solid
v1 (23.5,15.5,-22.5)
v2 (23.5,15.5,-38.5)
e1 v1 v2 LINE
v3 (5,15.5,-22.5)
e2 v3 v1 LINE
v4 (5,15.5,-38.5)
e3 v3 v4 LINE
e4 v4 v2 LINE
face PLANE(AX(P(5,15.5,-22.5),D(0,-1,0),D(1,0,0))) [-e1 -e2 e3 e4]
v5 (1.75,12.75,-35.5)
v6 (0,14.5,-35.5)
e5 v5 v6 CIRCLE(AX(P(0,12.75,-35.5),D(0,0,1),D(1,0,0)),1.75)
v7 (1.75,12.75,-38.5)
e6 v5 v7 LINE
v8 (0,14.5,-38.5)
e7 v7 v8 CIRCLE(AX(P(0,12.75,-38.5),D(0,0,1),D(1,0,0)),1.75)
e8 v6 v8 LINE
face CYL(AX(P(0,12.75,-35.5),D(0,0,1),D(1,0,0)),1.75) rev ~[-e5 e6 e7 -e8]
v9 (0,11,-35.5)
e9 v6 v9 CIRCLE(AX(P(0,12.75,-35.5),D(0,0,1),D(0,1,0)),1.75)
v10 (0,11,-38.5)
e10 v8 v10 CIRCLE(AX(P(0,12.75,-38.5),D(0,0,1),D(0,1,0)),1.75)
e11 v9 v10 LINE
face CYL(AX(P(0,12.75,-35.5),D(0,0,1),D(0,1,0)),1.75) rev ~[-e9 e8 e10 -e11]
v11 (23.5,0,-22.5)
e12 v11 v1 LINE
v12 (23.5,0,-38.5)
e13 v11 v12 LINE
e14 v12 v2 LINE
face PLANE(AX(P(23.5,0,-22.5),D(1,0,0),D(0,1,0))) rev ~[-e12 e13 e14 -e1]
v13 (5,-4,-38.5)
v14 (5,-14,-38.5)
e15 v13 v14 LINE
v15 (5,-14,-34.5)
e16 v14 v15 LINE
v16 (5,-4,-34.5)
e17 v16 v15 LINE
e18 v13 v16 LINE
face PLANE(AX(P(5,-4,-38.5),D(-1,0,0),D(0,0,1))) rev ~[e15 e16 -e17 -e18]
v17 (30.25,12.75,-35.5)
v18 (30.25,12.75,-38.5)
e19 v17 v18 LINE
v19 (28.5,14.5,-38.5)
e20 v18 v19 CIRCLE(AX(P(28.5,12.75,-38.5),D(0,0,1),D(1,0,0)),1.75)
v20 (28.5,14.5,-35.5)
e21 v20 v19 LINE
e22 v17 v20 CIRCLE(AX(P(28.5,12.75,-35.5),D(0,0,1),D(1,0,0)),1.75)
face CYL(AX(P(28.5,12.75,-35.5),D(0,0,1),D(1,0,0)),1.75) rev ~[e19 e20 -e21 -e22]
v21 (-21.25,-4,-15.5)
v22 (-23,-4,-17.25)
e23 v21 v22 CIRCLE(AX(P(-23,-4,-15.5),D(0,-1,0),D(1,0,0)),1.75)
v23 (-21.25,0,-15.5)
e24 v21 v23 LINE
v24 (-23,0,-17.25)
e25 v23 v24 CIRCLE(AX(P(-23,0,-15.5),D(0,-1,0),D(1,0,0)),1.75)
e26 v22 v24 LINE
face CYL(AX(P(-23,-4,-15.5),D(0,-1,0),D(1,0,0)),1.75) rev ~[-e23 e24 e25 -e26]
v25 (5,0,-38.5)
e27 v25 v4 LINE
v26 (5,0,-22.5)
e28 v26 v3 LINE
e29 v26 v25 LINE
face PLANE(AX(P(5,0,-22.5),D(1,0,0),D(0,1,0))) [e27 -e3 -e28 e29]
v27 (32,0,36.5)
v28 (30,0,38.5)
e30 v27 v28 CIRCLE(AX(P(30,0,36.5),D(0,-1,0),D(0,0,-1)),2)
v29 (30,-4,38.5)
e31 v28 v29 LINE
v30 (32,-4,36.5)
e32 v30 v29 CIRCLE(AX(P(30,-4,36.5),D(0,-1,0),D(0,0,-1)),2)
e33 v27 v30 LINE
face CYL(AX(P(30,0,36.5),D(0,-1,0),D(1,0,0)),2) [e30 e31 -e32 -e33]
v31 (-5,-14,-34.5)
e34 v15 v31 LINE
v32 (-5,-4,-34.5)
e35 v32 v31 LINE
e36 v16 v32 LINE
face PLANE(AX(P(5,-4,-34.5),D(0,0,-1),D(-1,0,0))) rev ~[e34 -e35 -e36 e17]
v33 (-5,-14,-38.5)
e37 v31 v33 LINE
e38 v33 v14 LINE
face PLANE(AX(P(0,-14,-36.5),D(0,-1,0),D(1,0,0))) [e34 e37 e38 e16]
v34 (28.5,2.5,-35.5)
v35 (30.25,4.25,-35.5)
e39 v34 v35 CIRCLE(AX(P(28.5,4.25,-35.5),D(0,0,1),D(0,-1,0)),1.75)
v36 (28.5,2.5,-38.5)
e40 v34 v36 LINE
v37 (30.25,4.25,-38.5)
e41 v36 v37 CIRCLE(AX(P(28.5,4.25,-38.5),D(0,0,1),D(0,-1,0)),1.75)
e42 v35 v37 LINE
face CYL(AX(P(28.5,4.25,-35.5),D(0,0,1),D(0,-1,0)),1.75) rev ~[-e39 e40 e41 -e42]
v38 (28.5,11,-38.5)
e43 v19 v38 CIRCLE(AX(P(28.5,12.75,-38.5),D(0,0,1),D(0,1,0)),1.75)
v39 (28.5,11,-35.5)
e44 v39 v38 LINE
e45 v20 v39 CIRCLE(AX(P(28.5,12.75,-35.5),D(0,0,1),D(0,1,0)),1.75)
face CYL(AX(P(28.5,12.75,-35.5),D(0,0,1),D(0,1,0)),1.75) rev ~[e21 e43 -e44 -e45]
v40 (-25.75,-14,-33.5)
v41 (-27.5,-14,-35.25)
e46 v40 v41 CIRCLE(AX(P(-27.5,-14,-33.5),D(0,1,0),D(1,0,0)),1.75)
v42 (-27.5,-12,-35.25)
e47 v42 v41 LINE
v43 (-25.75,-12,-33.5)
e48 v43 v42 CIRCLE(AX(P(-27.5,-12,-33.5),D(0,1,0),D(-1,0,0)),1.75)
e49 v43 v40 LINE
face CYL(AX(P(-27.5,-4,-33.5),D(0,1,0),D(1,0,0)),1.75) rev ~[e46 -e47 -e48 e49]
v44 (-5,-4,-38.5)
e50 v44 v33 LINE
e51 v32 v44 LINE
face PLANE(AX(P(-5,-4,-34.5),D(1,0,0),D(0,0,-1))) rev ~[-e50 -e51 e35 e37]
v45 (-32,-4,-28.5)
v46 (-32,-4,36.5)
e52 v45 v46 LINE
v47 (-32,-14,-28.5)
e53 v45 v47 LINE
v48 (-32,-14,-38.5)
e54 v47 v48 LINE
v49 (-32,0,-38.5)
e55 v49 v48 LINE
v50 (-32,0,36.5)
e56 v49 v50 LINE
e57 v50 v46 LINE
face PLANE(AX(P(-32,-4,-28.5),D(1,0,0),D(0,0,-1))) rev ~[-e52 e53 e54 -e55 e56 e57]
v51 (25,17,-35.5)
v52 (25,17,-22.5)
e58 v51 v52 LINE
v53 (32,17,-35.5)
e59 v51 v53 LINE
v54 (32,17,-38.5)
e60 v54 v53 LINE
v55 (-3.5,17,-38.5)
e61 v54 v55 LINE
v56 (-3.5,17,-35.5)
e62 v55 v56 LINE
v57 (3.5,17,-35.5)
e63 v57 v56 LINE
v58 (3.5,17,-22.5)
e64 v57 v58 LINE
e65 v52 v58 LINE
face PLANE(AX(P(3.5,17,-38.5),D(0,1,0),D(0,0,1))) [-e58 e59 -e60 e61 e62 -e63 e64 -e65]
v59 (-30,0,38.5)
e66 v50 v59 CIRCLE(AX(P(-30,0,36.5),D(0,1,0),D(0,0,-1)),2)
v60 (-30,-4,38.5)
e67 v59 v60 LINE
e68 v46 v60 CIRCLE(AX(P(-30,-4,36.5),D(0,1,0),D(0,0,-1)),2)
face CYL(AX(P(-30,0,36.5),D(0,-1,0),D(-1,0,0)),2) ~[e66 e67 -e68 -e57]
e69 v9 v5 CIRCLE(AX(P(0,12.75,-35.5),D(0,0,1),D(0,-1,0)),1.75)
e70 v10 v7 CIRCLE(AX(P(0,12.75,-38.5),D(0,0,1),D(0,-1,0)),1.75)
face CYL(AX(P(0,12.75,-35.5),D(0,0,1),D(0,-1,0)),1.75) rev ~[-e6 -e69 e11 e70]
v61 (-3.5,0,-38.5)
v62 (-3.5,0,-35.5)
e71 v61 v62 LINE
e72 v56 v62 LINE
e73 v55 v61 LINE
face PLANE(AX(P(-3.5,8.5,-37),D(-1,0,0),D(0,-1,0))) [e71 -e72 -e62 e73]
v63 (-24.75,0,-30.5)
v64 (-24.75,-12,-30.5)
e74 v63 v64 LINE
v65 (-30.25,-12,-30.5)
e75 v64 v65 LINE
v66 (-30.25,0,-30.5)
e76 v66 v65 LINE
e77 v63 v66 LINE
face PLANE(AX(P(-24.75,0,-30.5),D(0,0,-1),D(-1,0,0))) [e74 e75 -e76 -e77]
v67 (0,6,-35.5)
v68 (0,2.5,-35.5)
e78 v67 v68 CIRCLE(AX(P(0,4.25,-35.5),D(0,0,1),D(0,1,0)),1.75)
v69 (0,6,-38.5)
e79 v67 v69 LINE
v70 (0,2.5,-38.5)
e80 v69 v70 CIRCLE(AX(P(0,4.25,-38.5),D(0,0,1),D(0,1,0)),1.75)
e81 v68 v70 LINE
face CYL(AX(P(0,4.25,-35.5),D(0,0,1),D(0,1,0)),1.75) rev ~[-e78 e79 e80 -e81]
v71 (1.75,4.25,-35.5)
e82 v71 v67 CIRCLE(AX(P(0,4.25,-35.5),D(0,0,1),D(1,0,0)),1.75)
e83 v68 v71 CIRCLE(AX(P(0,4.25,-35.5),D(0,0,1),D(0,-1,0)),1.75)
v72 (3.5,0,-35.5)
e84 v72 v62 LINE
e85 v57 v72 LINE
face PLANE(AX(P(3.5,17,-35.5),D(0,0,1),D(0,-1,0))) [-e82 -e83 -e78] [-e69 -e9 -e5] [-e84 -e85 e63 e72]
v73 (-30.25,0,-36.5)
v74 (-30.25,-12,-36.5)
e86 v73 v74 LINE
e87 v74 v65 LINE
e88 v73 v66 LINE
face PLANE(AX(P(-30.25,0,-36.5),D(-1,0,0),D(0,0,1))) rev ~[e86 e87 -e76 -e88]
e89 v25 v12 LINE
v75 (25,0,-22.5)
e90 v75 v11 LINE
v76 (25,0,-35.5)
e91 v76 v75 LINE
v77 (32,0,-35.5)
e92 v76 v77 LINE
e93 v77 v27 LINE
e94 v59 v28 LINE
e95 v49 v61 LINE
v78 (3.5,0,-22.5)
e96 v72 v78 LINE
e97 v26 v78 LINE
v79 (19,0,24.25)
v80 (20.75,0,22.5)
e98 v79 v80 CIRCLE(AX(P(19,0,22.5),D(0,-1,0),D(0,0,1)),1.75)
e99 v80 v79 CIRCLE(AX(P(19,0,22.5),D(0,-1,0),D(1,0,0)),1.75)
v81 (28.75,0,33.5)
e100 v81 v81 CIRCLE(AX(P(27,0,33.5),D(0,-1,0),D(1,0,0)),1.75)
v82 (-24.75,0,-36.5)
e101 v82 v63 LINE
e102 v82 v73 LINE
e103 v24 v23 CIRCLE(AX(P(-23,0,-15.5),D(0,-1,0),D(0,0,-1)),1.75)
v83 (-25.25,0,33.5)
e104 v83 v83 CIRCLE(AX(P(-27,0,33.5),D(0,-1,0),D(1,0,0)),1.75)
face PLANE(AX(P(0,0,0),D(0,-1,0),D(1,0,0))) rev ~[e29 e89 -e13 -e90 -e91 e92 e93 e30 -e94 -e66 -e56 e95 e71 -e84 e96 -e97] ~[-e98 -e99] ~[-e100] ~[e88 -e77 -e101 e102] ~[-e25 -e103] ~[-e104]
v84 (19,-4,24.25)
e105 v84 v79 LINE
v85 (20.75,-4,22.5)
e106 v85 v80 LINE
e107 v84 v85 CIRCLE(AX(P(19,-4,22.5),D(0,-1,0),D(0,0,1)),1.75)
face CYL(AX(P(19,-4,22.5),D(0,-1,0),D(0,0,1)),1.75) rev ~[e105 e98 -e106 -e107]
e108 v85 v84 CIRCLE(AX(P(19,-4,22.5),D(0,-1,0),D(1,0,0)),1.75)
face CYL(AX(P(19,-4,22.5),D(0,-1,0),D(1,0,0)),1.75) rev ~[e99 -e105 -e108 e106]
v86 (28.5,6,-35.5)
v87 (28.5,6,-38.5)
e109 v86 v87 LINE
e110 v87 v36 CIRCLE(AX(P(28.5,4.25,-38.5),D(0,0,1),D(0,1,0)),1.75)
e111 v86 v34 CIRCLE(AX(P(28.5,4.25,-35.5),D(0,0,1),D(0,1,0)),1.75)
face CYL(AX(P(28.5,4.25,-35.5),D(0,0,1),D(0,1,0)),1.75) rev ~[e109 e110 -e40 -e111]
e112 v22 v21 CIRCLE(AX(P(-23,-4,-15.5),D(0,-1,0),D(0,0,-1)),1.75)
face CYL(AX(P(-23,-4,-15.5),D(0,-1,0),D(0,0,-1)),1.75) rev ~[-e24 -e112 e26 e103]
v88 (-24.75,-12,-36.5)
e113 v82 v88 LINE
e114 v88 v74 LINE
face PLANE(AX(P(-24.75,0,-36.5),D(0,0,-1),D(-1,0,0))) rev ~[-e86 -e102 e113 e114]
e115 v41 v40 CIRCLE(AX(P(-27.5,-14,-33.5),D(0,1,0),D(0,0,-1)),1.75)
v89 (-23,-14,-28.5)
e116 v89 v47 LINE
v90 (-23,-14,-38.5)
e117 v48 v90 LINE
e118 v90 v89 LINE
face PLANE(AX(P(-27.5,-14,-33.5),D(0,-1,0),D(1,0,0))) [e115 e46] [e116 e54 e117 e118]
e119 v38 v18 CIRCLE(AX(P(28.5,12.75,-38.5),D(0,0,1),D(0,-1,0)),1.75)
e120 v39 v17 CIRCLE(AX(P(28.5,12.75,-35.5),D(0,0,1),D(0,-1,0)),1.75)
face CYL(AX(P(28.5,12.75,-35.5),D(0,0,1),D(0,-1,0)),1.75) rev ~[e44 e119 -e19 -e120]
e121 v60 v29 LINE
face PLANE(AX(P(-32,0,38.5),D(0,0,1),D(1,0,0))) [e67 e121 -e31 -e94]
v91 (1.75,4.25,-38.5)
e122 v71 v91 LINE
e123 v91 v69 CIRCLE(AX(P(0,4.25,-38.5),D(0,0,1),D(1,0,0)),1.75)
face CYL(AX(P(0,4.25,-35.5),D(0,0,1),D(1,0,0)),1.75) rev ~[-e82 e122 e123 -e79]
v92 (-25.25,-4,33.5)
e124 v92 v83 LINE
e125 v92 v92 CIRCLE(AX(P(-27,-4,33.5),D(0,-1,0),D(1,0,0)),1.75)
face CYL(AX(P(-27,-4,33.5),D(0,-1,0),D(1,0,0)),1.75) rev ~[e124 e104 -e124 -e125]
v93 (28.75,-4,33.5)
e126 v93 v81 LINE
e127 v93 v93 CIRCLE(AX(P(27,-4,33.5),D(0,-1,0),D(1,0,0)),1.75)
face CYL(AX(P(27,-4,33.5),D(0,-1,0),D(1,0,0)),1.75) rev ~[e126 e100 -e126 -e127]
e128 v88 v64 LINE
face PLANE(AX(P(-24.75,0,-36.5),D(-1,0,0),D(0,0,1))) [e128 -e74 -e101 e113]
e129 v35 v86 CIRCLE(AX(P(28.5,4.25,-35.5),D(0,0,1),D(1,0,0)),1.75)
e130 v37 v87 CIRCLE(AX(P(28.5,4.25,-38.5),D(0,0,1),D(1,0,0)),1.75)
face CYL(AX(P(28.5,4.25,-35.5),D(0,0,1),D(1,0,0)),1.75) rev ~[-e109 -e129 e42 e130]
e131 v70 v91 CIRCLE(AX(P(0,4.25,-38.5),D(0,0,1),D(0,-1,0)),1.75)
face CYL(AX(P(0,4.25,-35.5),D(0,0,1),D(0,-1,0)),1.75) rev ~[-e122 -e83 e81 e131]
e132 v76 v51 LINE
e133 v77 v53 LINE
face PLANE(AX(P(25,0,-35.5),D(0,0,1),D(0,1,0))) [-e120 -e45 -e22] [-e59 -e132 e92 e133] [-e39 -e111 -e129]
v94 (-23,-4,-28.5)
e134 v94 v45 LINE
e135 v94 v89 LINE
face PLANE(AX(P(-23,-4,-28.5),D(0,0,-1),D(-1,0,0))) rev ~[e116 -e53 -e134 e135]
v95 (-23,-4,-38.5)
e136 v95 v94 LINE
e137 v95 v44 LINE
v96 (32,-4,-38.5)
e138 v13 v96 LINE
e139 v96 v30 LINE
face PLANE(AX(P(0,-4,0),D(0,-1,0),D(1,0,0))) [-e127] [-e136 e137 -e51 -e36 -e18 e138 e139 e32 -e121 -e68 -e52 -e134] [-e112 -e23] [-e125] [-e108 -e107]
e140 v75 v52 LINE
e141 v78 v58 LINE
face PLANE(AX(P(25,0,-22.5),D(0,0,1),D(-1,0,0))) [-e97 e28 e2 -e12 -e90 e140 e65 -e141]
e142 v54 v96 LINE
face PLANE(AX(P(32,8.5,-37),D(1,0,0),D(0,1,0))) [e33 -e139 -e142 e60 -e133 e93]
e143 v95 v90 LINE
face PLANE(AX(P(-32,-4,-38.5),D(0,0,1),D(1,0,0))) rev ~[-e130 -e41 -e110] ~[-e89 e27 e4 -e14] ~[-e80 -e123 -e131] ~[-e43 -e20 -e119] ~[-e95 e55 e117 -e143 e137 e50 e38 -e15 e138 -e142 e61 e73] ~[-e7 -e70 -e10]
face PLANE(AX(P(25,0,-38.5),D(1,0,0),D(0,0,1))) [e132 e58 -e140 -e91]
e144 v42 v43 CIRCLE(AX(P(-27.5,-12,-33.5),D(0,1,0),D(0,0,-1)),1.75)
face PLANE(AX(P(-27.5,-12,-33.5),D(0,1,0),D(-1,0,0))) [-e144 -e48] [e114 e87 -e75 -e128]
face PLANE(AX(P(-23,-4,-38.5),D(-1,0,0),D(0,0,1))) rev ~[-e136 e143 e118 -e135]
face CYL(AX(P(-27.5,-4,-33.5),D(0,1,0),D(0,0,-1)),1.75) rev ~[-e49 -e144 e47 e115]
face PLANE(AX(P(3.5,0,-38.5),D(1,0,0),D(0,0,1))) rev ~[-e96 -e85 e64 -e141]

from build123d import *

# Parameters (mm, degrees)
F0_W      = 64
F0_H      = 77
F1_DEPTH  = 4
F2_R      = 1.75
F3_DEPTH  = 25
F5_DEPTH  = 10
F7_DEPTH  = 25
F8_W      = 21.5
F8_H      = 16
F9_DEPTH  = 17
F10_W     = 18.5
F10_H     = 15.5
F11_DEPTH = 25
F12_W     = 17
F12_H     = 3
F13_DEPTH = 7
F14_W     = 17
F14_H     = 3
F15_DEPTH = 7
F17_DEPTH = 25
F19_DEPTH = 25
F21_DEPTH = 10
F22_DEPTH = 25
F23_W     = 5.5
F23_H     = 6
F23_R     = 1.75
F24_DEPTH = 12
F25_R     = 2


# Not quite as in the source:
# - a feature names something its author has since deleted; it is built from what else it names


with BuildPart() as f1:
    # F0 (on Front) → F1 (new body)
    with BuildSketch(Plane.XZ):
        Rectangle(F0_W, F0_H)
    extrude(amount=F1_DEPTH)

    # F2 (on face) → F3 (cut)
    with BuildSketch(Plane.XZ.offset(4)):
        with BuildLine():
            ThreePointArc((-28.75, 33.5), (-27, 31.75), (-25.25, 33.5))
            ThreePointArc((-25.25, 33.5), (-27, 35.25), (-28.75, 33.5))
        make_face()
        with Locations((27, 33.5)):
            Circle(F2_R)
    extrude(amount=-F3_DEPTH, mode=Mode.SUBTRACT)

    # F4 (on face) → F5 (join)
    with BuildSketch(Plane.XZ.offset(4)):
        Polygon((-5, -34.5), (-5, -38.5), (0, -38.5), (5, -38.5), (5, -34.5), align=None)
    extrude(amount=F5_DEPTH)

    # F6 (on face) → F7 (cut)
    with BuildSketch(Plane.XZ.offset(4)):
        with BuildLine():
            Line((19, 22.5), (19, 24.25))
            ThreePointArc((19, 24.25), (17.7625631329, 21.2625631329), (20.75, 22.5))
            Line((20.75, 22.5), (19, 22.5))
        make_face()
        with BuildLine():
            ThreePointArc((20.75, 22.5), (20.2374368671, 23.7374368671), (19, 24.25))
            Line((19, 24.25), (19, 22.5))
            Line((19, 22.5), (20.75, 22.5))
        make_face()
        with BuildLine():
            ThreePointArc((-21.25, -15.5), (-24.2374368671, -14.2625631329), (-23, -17.25))
            ThreePointArc((-23, -17.25), (-21.7625631329, -16.7374368671), (-21.25, -15.5))
        make_face()
    extrude(amount=-F7_DEPTH, mode=Mode.SUBTRACT)

    # F8 (on face) → F9 (join)
    with BuildSketch(Plane(origin=(0, 0, 0), x_dir=(-1, 0, 0), z_dir=(0, 1, 0))):
        with Locations((-14.25, -30.5)):
            Rectangle(F8_W, F8_H)
    extrude(amount=F9_DEPTH)

    # F10 (on face) → F11 (cut)
    with BuildSketch(Plane.XY.offset(-22.5)):
        with Locations((14.25, 7.75)):
            Rectangle(F10_W, F10_H)
    extrude(amount=-F11_DEPTH, mode=Mode.SUBTRACT)

    # F12 (on face) → F13 (join)
    with BuildSketch(Plane.YZ.offset(25)):
        with Locations((8.5, -37)):
            Rectangle(F12_W, F12_H)
    extrude(amount=F13_DEPTH)

    # F14 (on face) → F15 (join)
    with BuildSketch(Plane(origin=(3.5, 0, 0), x_dir=(0, -1, 0), z_dir=(-1, 0, 0))):
        with Locations((-8.5, -37)):
            Rectangle(F14_W, F14_H)
    extrude(amount=F15_DEPTH)

    # F16 (on face) → F17 (cut)
    with BuildSketch(Plane.XY.offset(-35.5)):
        with BuildLine():
            Line((0, 14.5), (0, 11))
            ThreePointArc((0, 11), (1.2374368671, 11.5125631329), (1.75, 12.75))
            ThreePointArc((1.75, 12.75), (1.2374368671, 13.9874368671), (0, 14.5))
        make_face()
        with BuildLine():
            ThreePointArc((0, 14.5), (-1.75, 12.75), (0, 11))
            Line((0, 11), (0, 14.5))
        make_face()
        with BuildLine():
            ThreePointArc((0, 6), (-1.75, 4.25), (0, 2.5))
            Line((0, 2.5), (0, 6))
        make_face()
        with BuildLine():
            Line((0, 6), (0, 2.5))
            ThreePointArc((0, 2.5), (1.2374368671, 3.0125631329), (1.75, 4.25))
            ThreePointArc((1.75, 4.25), (1.2374368671, 5.4874368671), (0, 6))
        make_face()
    extrude(amount=-F17_DEPTH, mode=Mode.SUBTRACT)

    # F18 (on face) → F19 (cut)
    with BuildSketch(Plane.XY.offset(-35.5)):
        with BuildLine():
            ThreePointArc((30.25, 12.75), (29.7374368671, 13.9874368671), (28.5, 14.5))
            Line((28.5, 14.5), (28.5, 11))
            ThreePointArc((28.5, 11), (29.7374368671, 11.5125631329), (30.25, 12.75))
        make_face()
        with BuildLine():
            ThreePointArc((30.25, 4.25), (29.7374368671, 5.4874368671), (28.5, 6))
            Line((28.5, 6), (28.5, 2.5))
            ThreePointArc((28.5, 2.5), (29.7374368671, 3.0125631329), (30.25, 4.25))
        make_face()
        with BuildLine():
            Line((28.5, 2.5), (28.5, 6))
            ThreePointArc((28.5, 6), (26.75, 4.25), (28.5, 2.5))
        make_face()
        with BuildLine():
            Line((28.5, 11), (28.5, 14.5))
            ThreePointArc((28.5, 14.5), (26.75, 12.75), (28.5, 11))
        make_face()
    extrude(amount=-F19_DEPTH, mode=Mode.SUBTRACT)

    # F20 (on face) → F21 (join)
    with BuildSketch(Plane.XZ.offset(4)):
        Polygon((-32, -28.5), (-32, -38.5), (-27.5, -38.5), (-23, -38.5), (-23, -28.5), align=None)
        with BuildLine():
            ThreePointArc((-25.75, -33.5), (-26.2625631329, -34.7374368671), (-27.5, -35.25))
            ThreePointArc((-27.5, -35.25), (-28.7374368671, -32.2625631329), (-25.75, -33.5))
        make_face(mode=Mode.SUBTRACT)
    extrude(amount=F21_DEPTH)

    # F22 (cut): a face of the model
    f22_faces = [f1.faces().sort_by_distance(p)[0] for p in [
        (-27.5, -4, -33.5),
    ]]
    extrude(f22_faces, amount=-F22_DEPTH, mode=Mode.SUBTRACT)

    # F23 (on face) → F24 (cut)
    with BuildSketch(Plane(origin=(0, 0, 0), x_dir=(-1, 0, 0), z_dir=(0, 1, 0))):
        with Locations((27.5, -33.5)):
            Rectangle(F23_W, F23_H)
        with Locations((27.5, -33.5)):
            Circle(F23_R, mode=Mode.SUBTRACT)
    extrude(amount=-F24_DEPTH, mode=Mode.SUBTRACT)

    # F25
    f25_edges = [f1.edges().sort_by_distance(p)[0] for p in [
        (-32, -2, 38.5),
        (32, -2, 38.5),
    ]]
    fillet(f25_edges, radius=F25_R)


solid = f1.part
